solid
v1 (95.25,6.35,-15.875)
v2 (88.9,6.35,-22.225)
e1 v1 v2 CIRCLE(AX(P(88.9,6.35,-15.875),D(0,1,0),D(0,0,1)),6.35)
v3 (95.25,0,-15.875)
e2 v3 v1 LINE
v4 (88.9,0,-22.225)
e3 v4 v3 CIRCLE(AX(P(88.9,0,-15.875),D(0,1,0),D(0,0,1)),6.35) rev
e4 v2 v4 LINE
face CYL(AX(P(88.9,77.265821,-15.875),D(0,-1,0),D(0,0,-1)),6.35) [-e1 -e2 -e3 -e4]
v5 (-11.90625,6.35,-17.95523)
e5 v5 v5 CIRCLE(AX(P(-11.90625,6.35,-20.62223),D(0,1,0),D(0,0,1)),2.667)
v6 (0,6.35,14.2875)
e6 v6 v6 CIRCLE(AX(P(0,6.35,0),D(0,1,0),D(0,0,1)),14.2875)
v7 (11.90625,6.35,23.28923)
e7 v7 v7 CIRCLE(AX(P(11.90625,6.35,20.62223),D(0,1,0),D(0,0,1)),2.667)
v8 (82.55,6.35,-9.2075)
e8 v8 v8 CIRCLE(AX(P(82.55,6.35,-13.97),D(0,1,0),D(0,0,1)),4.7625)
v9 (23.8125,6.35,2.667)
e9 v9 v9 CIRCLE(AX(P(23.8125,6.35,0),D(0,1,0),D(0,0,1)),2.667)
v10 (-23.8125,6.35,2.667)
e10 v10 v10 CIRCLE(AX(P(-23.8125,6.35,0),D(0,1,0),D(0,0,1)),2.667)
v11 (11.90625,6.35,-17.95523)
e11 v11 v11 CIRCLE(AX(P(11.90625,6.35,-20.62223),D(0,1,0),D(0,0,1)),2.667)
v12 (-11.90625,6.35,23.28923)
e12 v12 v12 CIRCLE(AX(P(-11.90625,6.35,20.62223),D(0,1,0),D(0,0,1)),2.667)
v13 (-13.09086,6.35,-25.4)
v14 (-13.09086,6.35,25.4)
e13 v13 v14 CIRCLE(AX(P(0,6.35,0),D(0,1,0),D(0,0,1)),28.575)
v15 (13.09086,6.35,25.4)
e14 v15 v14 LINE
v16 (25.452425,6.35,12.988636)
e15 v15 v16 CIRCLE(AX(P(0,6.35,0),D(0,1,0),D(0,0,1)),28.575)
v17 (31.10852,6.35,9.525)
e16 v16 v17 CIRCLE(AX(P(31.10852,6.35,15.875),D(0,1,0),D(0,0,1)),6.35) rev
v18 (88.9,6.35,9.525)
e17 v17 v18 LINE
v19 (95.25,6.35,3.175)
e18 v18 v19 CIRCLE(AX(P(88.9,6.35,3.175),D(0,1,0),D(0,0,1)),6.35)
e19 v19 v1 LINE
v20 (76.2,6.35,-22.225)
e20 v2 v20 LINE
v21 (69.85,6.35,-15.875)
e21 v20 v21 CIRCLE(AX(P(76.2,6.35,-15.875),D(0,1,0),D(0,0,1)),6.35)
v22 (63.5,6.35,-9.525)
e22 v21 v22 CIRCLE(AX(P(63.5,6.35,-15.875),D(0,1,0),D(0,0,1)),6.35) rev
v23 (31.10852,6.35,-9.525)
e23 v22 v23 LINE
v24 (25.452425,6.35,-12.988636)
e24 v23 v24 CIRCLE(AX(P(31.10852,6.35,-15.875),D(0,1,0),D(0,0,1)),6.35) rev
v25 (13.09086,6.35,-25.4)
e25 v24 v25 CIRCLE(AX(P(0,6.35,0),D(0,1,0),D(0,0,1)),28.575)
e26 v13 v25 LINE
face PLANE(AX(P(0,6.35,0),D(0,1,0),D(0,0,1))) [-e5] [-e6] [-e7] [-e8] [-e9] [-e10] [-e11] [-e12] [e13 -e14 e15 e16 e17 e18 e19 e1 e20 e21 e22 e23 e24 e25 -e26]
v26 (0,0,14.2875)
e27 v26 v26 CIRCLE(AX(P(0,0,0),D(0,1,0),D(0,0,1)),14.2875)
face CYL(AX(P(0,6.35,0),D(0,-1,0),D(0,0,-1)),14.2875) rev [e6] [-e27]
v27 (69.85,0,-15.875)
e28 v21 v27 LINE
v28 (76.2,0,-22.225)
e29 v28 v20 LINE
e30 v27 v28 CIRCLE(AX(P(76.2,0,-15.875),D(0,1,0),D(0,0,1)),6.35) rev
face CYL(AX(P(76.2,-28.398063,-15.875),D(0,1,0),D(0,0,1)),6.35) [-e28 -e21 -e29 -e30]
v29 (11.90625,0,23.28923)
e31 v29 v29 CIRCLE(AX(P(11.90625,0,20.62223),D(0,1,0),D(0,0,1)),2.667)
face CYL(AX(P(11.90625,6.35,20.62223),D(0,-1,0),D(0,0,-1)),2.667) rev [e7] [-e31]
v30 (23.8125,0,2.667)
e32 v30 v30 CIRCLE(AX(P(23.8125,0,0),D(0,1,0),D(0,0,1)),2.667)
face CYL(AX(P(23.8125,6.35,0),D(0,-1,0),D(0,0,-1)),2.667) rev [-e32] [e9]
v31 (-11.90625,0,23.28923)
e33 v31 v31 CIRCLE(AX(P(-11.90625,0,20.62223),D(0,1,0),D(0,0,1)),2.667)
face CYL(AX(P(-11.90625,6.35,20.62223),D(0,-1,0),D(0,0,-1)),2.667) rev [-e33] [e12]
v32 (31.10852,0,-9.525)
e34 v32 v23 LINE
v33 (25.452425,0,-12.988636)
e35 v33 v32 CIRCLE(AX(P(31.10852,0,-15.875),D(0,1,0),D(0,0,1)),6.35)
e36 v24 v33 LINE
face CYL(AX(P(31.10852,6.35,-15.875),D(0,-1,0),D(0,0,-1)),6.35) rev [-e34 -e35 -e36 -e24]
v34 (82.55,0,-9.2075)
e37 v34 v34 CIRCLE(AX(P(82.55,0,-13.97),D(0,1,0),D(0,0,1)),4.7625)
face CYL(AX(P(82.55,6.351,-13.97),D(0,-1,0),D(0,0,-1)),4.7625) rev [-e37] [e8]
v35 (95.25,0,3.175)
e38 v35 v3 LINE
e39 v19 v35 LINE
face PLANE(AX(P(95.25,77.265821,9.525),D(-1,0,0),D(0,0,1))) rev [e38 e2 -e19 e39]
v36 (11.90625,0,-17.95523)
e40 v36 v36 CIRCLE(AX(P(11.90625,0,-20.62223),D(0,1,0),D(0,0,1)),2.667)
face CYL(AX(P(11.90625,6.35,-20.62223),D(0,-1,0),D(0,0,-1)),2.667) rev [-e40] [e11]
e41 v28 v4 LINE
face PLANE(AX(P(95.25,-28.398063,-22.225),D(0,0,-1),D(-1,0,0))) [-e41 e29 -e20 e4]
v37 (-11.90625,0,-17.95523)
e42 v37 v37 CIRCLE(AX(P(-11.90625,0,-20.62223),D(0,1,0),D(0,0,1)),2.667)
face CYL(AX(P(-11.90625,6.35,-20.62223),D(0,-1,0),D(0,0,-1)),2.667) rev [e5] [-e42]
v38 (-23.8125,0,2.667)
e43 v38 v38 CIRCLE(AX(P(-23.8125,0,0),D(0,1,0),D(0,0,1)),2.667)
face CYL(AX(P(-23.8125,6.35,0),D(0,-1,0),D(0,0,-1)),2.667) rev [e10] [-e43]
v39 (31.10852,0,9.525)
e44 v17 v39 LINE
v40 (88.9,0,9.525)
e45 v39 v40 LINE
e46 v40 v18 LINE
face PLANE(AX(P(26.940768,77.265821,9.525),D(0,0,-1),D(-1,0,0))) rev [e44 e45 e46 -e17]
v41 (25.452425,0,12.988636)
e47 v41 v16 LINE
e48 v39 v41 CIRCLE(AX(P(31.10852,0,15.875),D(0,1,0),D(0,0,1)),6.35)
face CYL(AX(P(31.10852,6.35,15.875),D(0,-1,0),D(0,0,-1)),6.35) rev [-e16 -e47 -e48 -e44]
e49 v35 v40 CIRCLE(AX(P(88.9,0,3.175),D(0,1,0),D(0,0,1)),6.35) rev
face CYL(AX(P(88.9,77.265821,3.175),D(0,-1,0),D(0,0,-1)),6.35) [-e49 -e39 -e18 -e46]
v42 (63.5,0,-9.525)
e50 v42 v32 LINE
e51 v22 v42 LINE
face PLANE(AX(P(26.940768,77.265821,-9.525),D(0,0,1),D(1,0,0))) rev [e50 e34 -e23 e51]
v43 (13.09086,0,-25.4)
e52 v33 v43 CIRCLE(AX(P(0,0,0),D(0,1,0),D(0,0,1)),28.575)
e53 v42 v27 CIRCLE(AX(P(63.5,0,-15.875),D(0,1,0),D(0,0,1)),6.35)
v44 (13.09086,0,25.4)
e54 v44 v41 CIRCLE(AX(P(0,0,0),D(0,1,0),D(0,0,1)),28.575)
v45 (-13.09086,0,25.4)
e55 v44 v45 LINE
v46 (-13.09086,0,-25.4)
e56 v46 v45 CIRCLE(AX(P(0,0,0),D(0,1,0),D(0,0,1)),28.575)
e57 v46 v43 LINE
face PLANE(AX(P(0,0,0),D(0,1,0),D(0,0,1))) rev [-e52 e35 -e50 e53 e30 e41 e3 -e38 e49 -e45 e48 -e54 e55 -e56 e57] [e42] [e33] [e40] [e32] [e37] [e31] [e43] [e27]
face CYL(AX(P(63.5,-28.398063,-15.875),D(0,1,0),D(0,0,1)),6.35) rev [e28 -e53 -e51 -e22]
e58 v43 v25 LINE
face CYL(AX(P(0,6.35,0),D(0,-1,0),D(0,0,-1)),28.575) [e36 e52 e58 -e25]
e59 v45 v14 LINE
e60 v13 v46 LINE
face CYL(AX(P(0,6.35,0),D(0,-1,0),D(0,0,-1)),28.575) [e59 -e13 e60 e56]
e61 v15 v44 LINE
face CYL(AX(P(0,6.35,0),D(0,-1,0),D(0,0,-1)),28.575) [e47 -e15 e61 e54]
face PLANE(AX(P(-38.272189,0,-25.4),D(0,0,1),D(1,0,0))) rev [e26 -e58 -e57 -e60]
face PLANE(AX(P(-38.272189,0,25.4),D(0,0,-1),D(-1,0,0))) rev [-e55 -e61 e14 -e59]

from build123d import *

# Parameters (mm, degrees)
SKETCH1_R           = 28.575
SKETCH1_R_2         = 14.2875
SKETCH1_R_3         = 2.667
BOSS_EXTRUDE1_DEPTH = 6.35
BOSS_EXTRUDE2_DEPTH = 6.35
SKETCH3_W           = 25.4
SKETCH3_H           = 12.7
BOSS_EXTRUDE3_DEPTH = 6.35
CUT_EXTRUDE4_REACH  = 101.646
SKETCH4_R           = 4.7625
FILLET1_R           = 6.35
SKETCH5_W           = 86.18949407
SKETCH5_H           = 10.684979127
CUT_EXTRUDE5_DEPTH  = 100.646453148


with BuildPart() as part:
    # Sketch1 → Boss-Extrude1 (new body)
    with BuildSketch(Plane(origin=(0, 0, 0), x_dir=(1, 0, 0), z_dir=(0, 1, 0))):
        with Locations(Location((0, 0, 0), (0, 0, 270))):
            Circle(SKETCH1_R)
        with Locations(Location((0, 0, 0), (0, 0, 270))):
            Circle(SKETCH1_R_2, mode=Mode.SUBTRACT)
        with Locations(Location((11.90625, 20.622229928, 0), (0, 0, 270))):
            Circle(SKETCH1_R_3, mode=Mode.SUBTRACT)
        with Locations(Location((23.8125, 0, 0), (0, 0, 270))):
            Circle(SKETCH1_R_3, mode=Mode.SUBTRACT)
        with Locations(Location((11.90625, -20.622229928, 0), (0, 0, 270))):
            Circle(SKETCH1_R_3, mode=Mode.SUBTRACT)
        with Locations(Location((-11.90625, -20.622229928, 0), (0, 0, 270))):
            Circle(SKETCH1_R_3, mode=Mode.SUBTRACT)
        with Locations(Location((-23.8125, 0, 0), (0, 0, 270))):
            Circle(SKETCH1_R_3, mode=Mode.SUBTRACT)
        with Locations(Location((-11.90625, 20.622229928, 0), (0, 0, 270))):
            Circle(SKETCH1_R_3, mode=Mode.SUBTRACT)
    extrude(amount=BOSS_EXTRUDE1_DEPTH)

    # Sketch2 → Boss-Extrude2 (add)
    with BuildSketch(Plane(origin=(0, 0, 0), x_dir=(1, 0, 0), z_dir=(0, 1, 0))):
        with BuildLine():
            Line((26.940768363, -9.525), (95.25, -9.525))
            Line((95.25, -9.525), (95.25, 9.525))
            Line((95.25, 9.525), (26.940768363, 9.525))
            ThreePointArc((26.940768363, 9.525), (28.575, 0), (26.940768363, -9.525))
        make_face()
    extrude(amount=BOSS_EXTRUDE2_DEPTH)

    # Sketch3 → Boss-Extrude3 (add)
    with BuildSketch(Plane(origin=(0, 6.35, 0), x_dir=(1, 0, 0), z_dir=(0, 1, 0))):
        with Locations((82.55, 15.875)):
            Rectangle(SKETCH3_W, SKETCH3_H)
    extrude(amount=-BOSS_EXTRUDE3_DEPTH)

    # Sketch4 → Cut-Extrude4 (cut, up to next)
    with BuildSketch(Plane(origin=(0, 0, 0), x_dir=(1, 0, 0), z_dir=(0, 1, 0)), mode=Mode.PRIVATE) as cut_extrude4_sk1:
        with Locations(Location((82.55, 13.97, 0), (0, 0, 270))):
            Circle(SKETCH4_R)
    cut_extrude4_tool1 = extrude(cut_extrude4_sk1.sketch, amount=CUT_EXTRUDE4_REACH, mode=Mode.PRIVATE) & part.part
    add(cut_extrude4_tool1.solids().sort_by_distance((82.55, 0, -13.97))[0], mode=Mode.SUBTRACT)

    # Fillet1
    fillet1_edges = [part.edges().sort_by_distance(p)[0] for p in [
        (69.85, 3.175, -9.525),
        (95.25, 3.175, 9.525),
        (69.85, 3.175, -22.225),
        (95.25, 3.175, -22.225),
        (26.940768363, 3.175, 9.525),
        (26.940768363, 3.175, -9.525),
    ]]
    fillet(fillet1_edges, radius=FILLET1_R - 0.0001)  # a hair under: the kernel refuses the full size

    # Sketch5 → Cut-Extrude5 (cut, through all)
    with BuildSketch(Plane(origin=(0, 6.35, 0), x_dir=(1, 0, 0), z_dir=(0, 1, 0))):
        with Locations((4.822558491, 30.742489564)):
            Rectangle(SKETCH5_W, SKETCH5_H)
        with Locations((4.822558491, -30.742489564)):
            Rectangle(SKETCH5_W, SKETCH5_H)
    extrude(amount=-CUT_EXTRUDE5_DEPTH, mode=Mode.SUBTRACT)


solid = part.part
